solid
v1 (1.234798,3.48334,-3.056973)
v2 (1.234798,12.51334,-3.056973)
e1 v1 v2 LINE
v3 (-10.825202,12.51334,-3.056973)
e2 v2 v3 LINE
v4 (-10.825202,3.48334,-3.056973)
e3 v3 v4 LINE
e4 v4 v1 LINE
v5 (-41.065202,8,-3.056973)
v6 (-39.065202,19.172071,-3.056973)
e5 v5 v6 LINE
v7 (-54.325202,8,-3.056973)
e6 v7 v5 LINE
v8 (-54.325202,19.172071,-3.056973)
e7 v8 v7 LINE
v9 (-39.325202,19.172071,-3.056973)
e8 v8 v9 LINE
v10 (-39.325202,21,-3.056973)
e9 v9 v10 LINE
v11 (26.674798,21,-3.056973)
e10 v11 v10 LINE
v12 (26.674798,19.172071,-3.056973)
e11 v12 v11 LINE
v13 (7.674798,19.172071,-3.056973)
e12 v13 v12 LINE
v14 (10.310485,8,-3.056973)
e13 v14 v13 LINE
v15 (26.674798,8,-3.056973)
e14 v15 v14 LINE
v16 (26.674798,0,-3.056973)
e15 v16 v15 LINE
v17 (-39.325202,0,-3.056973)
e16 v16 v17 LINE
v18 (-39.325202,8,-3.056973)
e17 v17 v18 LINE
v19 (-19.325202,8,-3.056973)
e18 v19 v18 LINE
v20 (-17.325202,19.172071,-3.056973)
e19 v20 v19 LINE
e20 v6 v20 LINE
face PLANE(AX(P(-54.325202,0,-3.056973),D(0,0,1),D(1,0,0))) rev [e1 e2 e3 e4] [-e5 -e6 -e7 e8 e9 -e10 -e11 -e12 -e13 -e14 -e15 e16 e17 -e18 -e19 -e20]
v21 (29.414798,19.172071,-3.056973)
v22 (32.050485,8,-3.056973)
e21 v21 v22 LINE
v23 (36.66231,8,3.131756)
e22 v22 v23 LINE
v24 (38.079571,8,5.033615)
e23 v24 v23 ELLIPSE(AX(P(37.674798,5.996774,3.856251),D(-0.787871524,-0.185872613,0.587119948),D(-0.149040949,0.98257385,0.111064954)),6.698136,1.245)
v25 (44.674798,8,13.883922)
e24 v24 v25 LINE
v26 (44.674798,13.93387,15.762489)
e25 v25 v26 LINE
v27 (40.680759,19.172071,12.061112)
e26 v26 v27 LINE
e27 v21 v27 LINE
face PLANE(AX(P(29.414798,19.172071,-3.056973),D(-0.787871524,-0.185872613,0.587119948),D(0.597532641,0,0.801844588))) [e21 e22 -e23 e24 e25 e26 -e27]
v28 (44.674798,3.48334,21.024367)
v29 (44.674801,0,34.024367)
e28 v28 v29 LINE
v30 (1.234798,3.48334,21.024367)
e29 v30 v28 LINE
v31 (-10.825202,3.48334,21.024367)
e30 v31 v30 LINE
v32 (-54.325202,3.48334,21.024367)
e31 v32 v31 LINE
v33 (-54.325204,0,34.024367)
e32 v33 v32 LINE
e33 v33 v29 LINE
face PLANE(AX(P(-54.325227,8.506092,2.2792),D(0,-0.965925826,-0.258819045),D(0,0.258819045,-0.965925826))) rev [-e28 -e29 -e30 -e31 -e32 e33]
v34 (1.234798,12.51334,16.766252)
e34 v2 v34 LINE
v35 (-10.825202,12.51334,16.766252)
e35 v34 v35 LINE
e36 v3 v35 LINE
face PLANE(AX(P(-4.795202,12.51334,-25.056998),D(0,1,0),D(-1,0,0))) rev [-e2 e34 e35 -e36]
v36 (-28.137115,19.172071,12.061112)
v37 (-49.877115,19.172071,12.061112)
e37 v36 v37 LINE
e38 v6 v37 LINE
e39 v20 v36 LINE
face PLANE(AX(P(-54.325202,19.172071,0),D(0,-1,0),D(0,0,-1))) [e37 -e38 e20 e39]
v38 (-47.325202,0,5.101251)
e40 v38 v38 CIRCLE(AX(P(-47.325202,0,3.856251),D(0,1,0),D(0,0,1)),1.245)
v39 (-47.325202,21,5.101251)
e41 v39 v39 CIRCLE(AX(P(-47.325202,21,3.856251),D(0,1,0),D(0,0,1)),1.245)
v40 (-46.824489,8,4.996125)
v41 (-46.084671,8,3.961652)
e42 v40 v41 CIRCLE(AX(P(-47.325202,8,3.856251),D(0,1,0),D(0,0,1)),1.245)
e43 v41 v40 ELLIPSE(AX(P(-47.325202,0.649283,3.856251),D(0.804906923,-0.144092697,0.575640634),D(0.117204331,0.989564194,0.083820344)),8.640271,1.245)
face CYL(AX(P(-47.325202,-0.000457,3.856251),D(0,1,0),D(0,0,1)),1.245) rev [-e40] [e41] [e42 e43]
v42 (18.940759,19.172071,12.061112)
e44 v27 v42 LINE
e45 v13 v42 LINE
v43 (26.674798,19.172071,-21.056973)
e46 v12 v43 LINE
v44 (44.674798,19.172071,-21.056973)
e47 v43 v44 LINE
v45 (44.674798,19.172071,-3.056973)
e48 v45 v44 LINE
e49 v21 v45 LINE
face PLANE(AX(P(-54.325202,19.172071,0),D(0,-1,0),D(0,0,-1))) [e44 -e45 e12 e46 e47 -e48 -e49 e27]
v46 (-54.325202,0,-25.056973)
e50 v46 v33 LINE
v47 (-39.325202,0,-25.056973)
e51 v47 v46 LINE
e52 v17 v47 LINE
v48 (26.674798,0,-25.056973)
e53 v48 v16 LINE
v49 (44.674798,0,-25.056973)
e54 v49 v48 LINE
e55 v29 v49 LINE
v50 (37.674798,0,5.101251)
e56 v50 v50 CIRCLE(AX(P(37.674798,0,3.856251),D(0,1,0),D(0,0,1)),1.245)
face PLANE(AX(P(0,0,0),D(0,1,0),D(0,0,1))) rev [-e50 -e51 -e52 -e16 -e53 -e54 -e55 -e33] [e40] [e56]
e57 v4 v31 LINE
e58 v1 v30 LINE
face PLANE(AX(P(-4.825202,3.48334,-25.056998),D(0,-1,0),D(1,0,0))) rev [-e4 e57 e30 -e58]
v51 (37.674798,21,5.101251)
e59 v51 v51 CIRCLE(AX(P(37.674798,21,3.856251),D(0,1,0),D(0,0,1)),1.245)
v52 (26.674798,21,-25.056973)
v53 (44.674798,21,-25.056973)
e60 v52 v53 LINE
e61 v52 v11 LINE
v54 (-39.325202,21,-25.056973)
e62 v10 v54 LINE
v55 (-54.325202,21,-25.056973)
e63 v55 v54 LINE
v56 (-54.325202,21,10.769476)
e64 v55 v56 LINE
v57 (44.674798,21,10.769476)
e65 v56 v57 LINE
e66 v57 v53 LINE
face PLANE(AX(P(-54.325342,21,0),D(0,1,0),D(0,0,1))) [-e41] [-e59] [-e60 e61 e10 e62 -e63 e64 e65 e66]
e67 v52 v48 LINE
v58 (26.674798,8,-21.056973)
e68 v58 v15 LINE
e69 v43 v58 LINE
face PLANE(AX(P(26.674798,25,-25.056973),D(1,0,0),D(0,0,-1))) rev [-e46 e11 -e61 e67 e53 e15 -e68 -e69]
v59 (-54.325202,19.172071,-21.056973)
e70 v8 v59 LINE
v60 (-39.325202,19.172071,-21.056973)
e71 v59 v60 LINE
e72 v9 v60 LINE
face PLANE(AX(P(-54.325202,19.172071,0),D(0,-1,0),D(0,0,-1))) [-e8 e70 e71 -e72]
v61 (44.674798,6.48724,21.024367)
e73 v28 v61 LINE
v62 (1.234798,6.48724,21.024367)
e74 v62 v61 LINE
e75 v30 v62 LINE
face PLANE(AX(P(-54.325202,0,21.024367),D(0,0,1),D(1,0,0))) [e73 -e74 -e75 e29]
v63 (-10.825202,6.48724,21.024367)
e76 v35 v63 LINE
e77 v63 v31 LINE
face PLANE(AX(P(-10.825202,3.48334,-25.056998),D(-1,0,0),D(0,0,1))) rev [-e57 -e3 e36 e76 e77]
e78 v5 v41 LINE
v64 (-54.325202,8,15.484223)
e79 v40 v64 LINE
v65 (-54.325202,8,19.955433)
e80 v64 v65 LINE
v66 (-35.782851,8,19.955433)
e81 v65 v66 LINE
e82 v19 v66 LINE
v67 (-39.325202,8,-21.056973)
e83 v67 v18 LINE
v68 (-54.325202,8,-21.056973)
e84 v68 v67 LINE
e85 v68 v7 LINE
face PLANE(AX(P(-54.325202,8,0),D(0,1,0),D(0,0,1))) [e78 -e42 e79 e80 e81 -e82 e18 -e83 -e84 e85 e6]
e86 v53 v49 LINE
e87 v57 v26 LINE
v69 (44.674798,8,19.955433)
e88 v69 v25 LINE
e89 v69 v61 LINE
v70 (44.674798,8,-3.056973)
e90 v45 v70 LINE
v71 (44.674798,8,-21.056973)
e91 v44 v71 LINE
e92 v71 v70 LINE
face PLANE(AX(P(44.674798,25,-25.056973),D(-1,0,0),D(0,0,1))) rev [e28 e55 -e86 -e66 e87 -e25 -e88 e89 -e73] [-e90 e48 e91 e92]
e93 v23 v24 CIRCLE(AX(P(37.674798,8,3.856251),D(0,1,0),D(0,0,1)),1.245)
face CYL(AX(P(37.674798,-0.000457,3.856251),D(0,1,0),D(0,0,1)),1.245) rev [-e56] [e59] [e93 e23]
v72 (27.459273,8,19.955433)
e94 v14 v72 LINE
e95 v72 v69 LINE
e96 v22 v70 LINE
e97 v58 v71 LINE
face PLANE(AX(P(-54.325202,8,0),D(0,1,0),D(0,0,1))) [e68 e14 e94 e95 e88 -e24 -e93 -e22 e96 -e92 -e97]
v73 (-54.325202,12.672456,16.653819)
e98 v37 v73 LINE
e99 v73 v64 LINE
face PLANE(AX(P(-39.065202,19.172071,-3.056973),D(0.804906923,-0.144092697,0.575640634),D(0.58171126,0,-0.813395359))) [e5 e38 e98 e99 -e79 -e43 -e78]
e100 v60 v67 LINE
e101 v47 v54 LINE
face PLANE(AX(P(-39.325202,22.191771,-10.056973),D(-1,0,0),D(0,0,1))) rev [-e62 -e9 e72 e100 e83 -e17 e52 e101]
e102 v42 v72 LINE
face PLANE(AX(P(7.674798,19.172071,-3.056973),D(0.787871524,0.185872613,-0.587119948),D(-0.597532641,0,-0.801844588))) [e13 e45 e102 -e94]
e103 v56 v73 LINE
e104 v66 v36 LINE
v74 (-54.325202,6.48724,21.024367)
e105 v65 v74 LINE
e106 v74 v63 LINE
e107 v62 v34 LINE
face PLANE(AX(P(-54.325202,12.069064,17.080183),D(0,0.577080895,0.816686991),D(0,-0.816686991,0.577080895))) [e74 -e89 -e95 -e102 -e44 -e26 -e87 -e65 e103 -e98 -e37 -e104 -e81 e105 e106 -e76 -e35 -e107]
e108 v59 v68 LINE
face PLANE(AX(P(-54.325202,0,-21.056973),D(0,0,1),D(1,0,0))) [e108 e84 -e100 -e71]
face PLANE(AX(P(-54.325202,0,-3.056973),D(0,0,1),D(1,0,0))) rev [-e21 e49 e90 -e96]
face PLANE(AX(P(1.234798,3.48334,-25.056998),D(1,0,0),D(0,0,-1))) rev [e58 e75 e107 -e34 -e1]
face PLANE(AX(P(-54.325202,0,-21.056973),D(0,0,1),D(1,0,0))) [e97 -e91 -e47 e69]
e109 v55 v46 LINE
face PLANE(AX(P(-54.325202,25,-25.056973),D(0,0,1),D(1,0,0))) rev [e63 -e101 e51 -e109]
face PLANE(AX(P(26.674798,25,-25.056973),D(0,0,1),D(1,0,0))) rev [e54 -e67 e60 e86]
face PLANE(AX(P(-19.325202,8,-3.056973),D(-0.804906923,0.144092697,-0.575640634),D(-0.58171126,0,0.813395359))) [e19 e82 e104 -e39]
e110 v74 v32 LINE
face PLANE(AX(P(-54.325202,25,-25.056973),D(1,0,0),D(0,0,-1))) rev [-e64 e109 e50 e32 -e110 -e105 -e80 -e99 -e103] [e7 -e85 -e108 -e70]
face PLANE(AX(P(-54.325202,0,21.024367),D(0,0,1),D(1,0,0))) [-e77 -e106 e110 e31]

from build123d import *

# Parameters (mm, degrees)
BOSS_EXTRUDE2_DEPTH        = 25
SKETCH4_W                  = 18
SKETCH4_H                  = 11.172071032
CUT_EXTRUDE1_DEPTH         = 110.64235231
CUT_SWEEP3_START           = -47.833237702
CUT_SWEEP3_DEPTH           = 40.241500367
CUT_SWEEP4_START           = 2.134725454
CUT_SWEEP4_DEPTH           = 40.561080438
SKETCH24_W                 = 3
SKETCH24_H                 = 22.191771217
CUT_EXTRUDE15_DEPTH        = 15
CORTAR_EXTRUIR1_DEPTH      = 110.64235231
CORTAR_EXTRUIR1_DEPTH_BACK = 110.64235231
CORTAR_EXTRUIR2_DEPTH      = 110.64235231
CORTAR_EXTRUIR2_DEPTH_BACK = 110.64235231
CORTAR_EXTRUIR3_DEPTH      = 76.49647267
CORTAR_EXTRUIR3_DEPTH_BACK = 76.49647267
CORTAR_EXTRUIR4_DEPTH      = 108.627401408
CORTAR_EXTRUIR4_DEPTH_BACK = 108.627401408
CORTAR_EXTRUIR7_DEPTH      = 68.452835826
CORTAR_EXTRUIR7_DEPTH_BACK = 68.452835826
CROQUIS9_R                 = 1.245
CORTAR_EXTRUIR6_DEPTH      = 67.906302907
CORTAR_EXTRUIR6_DEPTH_BACK = 10


# Read off the part's stored shape, not the designer's step: Cut-Sweep3, Cut-Sweep4
with BuildPart() as part:
    # Sketch1 → Boss-Extrude2 (new body)
    with BuildSketch(Plane(origin=(0, 0, 0), x_dir=(1, 0, 0), z_dir=(0, 1, 0))):
        Polygon((26.674798416, 25.056972824), (44.674798416, 25.056972824), (44.674798416, -39.943027176), (-54.325201584, -39.943027176), (-54.325201584, 25.056972824), (-36.325201584, 25.056972824), (-36.325201584, 10.056972824), (26.674798416, 10.056972824), align=None)
    extrude(amount=BOSS_EXTRUDE2_DEPTH)

    # Sketch4 → Cut-Extrude1 (cut, through all)
    with BuildSketch(Plane(origin=(44.674798416, 0, 0), x_dir=(0, 0, -1), z_dir=(1, 0, 0))):
        Polygon((-39.943027176, 25), (-39.943027176, 0), (-21.024366767, 6.487240423), (-7.943027176, 25), align=None)
        with Locations((12.056972824, 13.586035516)):
            Rectangle(SKETCH4_W, SKETCH4_H)
    extrude(amount=-CUT_EXTRUDE1_DEPTH, mode=Mode.SUBTRACT)

    # Cut-Sweep3 outline → Cut-Sweep3 (cut)
    with BuildSketch(Plane(origin=(0, 0, 0), x_dir=(0.8133953590059209, 0, 0.5817112599457132), z_dir=(0.5817112599457132, 0, -0.8133953590059209)).offset(CUT_SWEEP3_START)):
        Polygon((-17.497304793, -8), (-35.180519898, -8), (-33.55372918, -19.172071032), (-15.870514075, -19.172071032), align=None)
    extrude(amount=CUT_SWEEP3_DEPTH, mode=Mode.SUBTRACT)

    # Cut-Sweep4 outline → Cut-Sweep4 (cut)
    with BuildSketch(Plane(origin=(0, 0, 0), x_dir=(0.8018445876826973, 0, -0.5975326411201026), z_dir=(0.5975326411201026, 0, 0.8018445876826972)).offset(CUT_SWEEP4_START)):
        Polygon((10.094047266, 8), (27.526148602, 8), (25.412737953, 19.172071032), (7.980636617, 19.172071032), align=None)
    extrude(amount=CUT_SWEEP4_DEPTH, mode=Mode.SUBTRACT)

    # Sketch24 → Cut-Extrude15 (cut)
    with BuildSketch(Plane(origin=(0, 0, -25.056972824), x_dir=(-1, 0, 0), z_dir=(0, 0, -1))):
        with Locations((37.825201584, 11.095885609)):
            Rectangle(SKETCH24_W, SKETCH24_H)
    extrude(amount=-CUT_EXTRUDE15_DEPTH, mode=Mode.SUBTRACT)

    # Croquis2 → Cortar-Extruir1 (cut, two sides: drawn at the far end of the back side and taken through both)
    with BuildSketch(Plane(origin=(44.674798416, 0, 0), x_dir=(0, 0, -1), z_dir=(1, 0, 0)).offset(-CORTAR_EXTRUIR1_DEPTH_BACK)):
        Polygon((-21.024366767, 5.069239779), (-21.024366767, 6.487240423), (-39.943027176, 0), align=None)
    extrude(amount=CORTAR_EXTRUIR1_DEPTH + CORTAR_EXTRUIR1_DEPTH_BACK, mode=Mode.SUBTRACT)

    # Croquis3 → Cortar-Extruir2 (cut, two sides: drawn at the far end of the back side and taken through both)
    with BuildSketch(Plane(origin=(44.674798416, 0, 0), x_dir=(0, 0, -1), z_dir=(1, 0, 0)).offset(-CORTAR_EXTRUIR2_DEPTH_BACK)):
        Polygon((-21.024366767, 3.483339502), (-21.024366767, 5.069239779), (-39.943027176, 0), (-34.024366767, 0), align=None)
    extrude(amount=CORTAR_EXTRUIR2_DEPTH + CORTAR_EXTRUIR2_DEPTH_BACK, mode=Mode.SUBTRACT)

    # Croquis4 → Cortar-Extruir3 (cut, two sides: drawn at the far end of the back side and taken through both)
    with BuildSketch(Plane.XY.offset(21.024366767).offset(-CORTAR_EXTRUIR3_DEPTH_BACK)):
        Polygon((-4.825201584, 3.483339502), (1.234798416, 3.483339502), (1.234798416, 12.513339502), (-4.795201584, 12.513339502), (-10.825201584, 12.513339502), (-10.825201584, 3.483339502), align=None)
    extrude(amount=CORTAR_EXTRUIR3_DEPTH + CORTAR_EXTRUIR3_DEPTH_BACK, mode=Mode.SUBTRACT)

    # Croquis5 → Cortar-Extruir4 (cut, two sides: drawn at the far end of the back side and taken through both)
    with BuildSketch(Plane(origin=(44.674798416, 0, 0), x_dir=(0, 0, -1), z_dir=(1, 0, 0)).offset(-CORTAR_EXTRUIR4_DEPTH_BACK)):
        Polygon((-10.769475505, 21), (-7.943027176, 21), (25.056972824, 21), (25.056972824, 25), (-7.943027176, 25), align=None)
    extrude(amount=CORTAR_EXTRUIR4_DEPTH + CORTAR_EXTRUIR4_DEPTH_BACK, mode=Mode.SUBTRACT)

    # Croquis9 → Cortar-Extruir7 (cut, two sides: drawn at the far end of the back side and taken through both)
    with BuildSketch(Plane(origin=(0, 21, 0), x_dir=(1, 0, 0), z_dir=(0, 1, 0)).offset(-CORTAR_EXTRUIR7_DEPTH_BACK)):
        with Locations(Location((-47.325201584, -3.856251341, 0), (0, 0, 270))):
            Circle(CROQUIS9_R)
        with Locations(Location((37.674798416, -3.856251341, 0), (0, 0, 270))):
            Circle(CROQUIS9_R)
    extrude(amount=CORTAR_EXTRUIR7_DEPTH + CORTAR_EXTRUIR7_DEPTH_BACK, mode=Mode.SUBTRACT)

    # Croquis7 → Cortar-Extruir6 (cut, two sides: drawn at the far end of the back side and taken through both)
    with BuildSketch(Plane.XZ.offset(-19.172071032).offset(-CORTAR_EXTRUIR6_DEPTH_BACK)):
        Polygon((-4.825201584, -3.056972824), (26.674798416, -3.056972824), (26.674798416, -10.056972824), (-4.825201584, -10.056972824), (-39.325201584, -10.056972824), (-39.325201584, -3.056972824), align=None)
    extrude(amount=CORTAR_EXTRUIR6_DEPTH + CORTAR_EXTRUIR6_DEPTH_BACK, mode=Mode.SUBTRACT)


solid = part.part
